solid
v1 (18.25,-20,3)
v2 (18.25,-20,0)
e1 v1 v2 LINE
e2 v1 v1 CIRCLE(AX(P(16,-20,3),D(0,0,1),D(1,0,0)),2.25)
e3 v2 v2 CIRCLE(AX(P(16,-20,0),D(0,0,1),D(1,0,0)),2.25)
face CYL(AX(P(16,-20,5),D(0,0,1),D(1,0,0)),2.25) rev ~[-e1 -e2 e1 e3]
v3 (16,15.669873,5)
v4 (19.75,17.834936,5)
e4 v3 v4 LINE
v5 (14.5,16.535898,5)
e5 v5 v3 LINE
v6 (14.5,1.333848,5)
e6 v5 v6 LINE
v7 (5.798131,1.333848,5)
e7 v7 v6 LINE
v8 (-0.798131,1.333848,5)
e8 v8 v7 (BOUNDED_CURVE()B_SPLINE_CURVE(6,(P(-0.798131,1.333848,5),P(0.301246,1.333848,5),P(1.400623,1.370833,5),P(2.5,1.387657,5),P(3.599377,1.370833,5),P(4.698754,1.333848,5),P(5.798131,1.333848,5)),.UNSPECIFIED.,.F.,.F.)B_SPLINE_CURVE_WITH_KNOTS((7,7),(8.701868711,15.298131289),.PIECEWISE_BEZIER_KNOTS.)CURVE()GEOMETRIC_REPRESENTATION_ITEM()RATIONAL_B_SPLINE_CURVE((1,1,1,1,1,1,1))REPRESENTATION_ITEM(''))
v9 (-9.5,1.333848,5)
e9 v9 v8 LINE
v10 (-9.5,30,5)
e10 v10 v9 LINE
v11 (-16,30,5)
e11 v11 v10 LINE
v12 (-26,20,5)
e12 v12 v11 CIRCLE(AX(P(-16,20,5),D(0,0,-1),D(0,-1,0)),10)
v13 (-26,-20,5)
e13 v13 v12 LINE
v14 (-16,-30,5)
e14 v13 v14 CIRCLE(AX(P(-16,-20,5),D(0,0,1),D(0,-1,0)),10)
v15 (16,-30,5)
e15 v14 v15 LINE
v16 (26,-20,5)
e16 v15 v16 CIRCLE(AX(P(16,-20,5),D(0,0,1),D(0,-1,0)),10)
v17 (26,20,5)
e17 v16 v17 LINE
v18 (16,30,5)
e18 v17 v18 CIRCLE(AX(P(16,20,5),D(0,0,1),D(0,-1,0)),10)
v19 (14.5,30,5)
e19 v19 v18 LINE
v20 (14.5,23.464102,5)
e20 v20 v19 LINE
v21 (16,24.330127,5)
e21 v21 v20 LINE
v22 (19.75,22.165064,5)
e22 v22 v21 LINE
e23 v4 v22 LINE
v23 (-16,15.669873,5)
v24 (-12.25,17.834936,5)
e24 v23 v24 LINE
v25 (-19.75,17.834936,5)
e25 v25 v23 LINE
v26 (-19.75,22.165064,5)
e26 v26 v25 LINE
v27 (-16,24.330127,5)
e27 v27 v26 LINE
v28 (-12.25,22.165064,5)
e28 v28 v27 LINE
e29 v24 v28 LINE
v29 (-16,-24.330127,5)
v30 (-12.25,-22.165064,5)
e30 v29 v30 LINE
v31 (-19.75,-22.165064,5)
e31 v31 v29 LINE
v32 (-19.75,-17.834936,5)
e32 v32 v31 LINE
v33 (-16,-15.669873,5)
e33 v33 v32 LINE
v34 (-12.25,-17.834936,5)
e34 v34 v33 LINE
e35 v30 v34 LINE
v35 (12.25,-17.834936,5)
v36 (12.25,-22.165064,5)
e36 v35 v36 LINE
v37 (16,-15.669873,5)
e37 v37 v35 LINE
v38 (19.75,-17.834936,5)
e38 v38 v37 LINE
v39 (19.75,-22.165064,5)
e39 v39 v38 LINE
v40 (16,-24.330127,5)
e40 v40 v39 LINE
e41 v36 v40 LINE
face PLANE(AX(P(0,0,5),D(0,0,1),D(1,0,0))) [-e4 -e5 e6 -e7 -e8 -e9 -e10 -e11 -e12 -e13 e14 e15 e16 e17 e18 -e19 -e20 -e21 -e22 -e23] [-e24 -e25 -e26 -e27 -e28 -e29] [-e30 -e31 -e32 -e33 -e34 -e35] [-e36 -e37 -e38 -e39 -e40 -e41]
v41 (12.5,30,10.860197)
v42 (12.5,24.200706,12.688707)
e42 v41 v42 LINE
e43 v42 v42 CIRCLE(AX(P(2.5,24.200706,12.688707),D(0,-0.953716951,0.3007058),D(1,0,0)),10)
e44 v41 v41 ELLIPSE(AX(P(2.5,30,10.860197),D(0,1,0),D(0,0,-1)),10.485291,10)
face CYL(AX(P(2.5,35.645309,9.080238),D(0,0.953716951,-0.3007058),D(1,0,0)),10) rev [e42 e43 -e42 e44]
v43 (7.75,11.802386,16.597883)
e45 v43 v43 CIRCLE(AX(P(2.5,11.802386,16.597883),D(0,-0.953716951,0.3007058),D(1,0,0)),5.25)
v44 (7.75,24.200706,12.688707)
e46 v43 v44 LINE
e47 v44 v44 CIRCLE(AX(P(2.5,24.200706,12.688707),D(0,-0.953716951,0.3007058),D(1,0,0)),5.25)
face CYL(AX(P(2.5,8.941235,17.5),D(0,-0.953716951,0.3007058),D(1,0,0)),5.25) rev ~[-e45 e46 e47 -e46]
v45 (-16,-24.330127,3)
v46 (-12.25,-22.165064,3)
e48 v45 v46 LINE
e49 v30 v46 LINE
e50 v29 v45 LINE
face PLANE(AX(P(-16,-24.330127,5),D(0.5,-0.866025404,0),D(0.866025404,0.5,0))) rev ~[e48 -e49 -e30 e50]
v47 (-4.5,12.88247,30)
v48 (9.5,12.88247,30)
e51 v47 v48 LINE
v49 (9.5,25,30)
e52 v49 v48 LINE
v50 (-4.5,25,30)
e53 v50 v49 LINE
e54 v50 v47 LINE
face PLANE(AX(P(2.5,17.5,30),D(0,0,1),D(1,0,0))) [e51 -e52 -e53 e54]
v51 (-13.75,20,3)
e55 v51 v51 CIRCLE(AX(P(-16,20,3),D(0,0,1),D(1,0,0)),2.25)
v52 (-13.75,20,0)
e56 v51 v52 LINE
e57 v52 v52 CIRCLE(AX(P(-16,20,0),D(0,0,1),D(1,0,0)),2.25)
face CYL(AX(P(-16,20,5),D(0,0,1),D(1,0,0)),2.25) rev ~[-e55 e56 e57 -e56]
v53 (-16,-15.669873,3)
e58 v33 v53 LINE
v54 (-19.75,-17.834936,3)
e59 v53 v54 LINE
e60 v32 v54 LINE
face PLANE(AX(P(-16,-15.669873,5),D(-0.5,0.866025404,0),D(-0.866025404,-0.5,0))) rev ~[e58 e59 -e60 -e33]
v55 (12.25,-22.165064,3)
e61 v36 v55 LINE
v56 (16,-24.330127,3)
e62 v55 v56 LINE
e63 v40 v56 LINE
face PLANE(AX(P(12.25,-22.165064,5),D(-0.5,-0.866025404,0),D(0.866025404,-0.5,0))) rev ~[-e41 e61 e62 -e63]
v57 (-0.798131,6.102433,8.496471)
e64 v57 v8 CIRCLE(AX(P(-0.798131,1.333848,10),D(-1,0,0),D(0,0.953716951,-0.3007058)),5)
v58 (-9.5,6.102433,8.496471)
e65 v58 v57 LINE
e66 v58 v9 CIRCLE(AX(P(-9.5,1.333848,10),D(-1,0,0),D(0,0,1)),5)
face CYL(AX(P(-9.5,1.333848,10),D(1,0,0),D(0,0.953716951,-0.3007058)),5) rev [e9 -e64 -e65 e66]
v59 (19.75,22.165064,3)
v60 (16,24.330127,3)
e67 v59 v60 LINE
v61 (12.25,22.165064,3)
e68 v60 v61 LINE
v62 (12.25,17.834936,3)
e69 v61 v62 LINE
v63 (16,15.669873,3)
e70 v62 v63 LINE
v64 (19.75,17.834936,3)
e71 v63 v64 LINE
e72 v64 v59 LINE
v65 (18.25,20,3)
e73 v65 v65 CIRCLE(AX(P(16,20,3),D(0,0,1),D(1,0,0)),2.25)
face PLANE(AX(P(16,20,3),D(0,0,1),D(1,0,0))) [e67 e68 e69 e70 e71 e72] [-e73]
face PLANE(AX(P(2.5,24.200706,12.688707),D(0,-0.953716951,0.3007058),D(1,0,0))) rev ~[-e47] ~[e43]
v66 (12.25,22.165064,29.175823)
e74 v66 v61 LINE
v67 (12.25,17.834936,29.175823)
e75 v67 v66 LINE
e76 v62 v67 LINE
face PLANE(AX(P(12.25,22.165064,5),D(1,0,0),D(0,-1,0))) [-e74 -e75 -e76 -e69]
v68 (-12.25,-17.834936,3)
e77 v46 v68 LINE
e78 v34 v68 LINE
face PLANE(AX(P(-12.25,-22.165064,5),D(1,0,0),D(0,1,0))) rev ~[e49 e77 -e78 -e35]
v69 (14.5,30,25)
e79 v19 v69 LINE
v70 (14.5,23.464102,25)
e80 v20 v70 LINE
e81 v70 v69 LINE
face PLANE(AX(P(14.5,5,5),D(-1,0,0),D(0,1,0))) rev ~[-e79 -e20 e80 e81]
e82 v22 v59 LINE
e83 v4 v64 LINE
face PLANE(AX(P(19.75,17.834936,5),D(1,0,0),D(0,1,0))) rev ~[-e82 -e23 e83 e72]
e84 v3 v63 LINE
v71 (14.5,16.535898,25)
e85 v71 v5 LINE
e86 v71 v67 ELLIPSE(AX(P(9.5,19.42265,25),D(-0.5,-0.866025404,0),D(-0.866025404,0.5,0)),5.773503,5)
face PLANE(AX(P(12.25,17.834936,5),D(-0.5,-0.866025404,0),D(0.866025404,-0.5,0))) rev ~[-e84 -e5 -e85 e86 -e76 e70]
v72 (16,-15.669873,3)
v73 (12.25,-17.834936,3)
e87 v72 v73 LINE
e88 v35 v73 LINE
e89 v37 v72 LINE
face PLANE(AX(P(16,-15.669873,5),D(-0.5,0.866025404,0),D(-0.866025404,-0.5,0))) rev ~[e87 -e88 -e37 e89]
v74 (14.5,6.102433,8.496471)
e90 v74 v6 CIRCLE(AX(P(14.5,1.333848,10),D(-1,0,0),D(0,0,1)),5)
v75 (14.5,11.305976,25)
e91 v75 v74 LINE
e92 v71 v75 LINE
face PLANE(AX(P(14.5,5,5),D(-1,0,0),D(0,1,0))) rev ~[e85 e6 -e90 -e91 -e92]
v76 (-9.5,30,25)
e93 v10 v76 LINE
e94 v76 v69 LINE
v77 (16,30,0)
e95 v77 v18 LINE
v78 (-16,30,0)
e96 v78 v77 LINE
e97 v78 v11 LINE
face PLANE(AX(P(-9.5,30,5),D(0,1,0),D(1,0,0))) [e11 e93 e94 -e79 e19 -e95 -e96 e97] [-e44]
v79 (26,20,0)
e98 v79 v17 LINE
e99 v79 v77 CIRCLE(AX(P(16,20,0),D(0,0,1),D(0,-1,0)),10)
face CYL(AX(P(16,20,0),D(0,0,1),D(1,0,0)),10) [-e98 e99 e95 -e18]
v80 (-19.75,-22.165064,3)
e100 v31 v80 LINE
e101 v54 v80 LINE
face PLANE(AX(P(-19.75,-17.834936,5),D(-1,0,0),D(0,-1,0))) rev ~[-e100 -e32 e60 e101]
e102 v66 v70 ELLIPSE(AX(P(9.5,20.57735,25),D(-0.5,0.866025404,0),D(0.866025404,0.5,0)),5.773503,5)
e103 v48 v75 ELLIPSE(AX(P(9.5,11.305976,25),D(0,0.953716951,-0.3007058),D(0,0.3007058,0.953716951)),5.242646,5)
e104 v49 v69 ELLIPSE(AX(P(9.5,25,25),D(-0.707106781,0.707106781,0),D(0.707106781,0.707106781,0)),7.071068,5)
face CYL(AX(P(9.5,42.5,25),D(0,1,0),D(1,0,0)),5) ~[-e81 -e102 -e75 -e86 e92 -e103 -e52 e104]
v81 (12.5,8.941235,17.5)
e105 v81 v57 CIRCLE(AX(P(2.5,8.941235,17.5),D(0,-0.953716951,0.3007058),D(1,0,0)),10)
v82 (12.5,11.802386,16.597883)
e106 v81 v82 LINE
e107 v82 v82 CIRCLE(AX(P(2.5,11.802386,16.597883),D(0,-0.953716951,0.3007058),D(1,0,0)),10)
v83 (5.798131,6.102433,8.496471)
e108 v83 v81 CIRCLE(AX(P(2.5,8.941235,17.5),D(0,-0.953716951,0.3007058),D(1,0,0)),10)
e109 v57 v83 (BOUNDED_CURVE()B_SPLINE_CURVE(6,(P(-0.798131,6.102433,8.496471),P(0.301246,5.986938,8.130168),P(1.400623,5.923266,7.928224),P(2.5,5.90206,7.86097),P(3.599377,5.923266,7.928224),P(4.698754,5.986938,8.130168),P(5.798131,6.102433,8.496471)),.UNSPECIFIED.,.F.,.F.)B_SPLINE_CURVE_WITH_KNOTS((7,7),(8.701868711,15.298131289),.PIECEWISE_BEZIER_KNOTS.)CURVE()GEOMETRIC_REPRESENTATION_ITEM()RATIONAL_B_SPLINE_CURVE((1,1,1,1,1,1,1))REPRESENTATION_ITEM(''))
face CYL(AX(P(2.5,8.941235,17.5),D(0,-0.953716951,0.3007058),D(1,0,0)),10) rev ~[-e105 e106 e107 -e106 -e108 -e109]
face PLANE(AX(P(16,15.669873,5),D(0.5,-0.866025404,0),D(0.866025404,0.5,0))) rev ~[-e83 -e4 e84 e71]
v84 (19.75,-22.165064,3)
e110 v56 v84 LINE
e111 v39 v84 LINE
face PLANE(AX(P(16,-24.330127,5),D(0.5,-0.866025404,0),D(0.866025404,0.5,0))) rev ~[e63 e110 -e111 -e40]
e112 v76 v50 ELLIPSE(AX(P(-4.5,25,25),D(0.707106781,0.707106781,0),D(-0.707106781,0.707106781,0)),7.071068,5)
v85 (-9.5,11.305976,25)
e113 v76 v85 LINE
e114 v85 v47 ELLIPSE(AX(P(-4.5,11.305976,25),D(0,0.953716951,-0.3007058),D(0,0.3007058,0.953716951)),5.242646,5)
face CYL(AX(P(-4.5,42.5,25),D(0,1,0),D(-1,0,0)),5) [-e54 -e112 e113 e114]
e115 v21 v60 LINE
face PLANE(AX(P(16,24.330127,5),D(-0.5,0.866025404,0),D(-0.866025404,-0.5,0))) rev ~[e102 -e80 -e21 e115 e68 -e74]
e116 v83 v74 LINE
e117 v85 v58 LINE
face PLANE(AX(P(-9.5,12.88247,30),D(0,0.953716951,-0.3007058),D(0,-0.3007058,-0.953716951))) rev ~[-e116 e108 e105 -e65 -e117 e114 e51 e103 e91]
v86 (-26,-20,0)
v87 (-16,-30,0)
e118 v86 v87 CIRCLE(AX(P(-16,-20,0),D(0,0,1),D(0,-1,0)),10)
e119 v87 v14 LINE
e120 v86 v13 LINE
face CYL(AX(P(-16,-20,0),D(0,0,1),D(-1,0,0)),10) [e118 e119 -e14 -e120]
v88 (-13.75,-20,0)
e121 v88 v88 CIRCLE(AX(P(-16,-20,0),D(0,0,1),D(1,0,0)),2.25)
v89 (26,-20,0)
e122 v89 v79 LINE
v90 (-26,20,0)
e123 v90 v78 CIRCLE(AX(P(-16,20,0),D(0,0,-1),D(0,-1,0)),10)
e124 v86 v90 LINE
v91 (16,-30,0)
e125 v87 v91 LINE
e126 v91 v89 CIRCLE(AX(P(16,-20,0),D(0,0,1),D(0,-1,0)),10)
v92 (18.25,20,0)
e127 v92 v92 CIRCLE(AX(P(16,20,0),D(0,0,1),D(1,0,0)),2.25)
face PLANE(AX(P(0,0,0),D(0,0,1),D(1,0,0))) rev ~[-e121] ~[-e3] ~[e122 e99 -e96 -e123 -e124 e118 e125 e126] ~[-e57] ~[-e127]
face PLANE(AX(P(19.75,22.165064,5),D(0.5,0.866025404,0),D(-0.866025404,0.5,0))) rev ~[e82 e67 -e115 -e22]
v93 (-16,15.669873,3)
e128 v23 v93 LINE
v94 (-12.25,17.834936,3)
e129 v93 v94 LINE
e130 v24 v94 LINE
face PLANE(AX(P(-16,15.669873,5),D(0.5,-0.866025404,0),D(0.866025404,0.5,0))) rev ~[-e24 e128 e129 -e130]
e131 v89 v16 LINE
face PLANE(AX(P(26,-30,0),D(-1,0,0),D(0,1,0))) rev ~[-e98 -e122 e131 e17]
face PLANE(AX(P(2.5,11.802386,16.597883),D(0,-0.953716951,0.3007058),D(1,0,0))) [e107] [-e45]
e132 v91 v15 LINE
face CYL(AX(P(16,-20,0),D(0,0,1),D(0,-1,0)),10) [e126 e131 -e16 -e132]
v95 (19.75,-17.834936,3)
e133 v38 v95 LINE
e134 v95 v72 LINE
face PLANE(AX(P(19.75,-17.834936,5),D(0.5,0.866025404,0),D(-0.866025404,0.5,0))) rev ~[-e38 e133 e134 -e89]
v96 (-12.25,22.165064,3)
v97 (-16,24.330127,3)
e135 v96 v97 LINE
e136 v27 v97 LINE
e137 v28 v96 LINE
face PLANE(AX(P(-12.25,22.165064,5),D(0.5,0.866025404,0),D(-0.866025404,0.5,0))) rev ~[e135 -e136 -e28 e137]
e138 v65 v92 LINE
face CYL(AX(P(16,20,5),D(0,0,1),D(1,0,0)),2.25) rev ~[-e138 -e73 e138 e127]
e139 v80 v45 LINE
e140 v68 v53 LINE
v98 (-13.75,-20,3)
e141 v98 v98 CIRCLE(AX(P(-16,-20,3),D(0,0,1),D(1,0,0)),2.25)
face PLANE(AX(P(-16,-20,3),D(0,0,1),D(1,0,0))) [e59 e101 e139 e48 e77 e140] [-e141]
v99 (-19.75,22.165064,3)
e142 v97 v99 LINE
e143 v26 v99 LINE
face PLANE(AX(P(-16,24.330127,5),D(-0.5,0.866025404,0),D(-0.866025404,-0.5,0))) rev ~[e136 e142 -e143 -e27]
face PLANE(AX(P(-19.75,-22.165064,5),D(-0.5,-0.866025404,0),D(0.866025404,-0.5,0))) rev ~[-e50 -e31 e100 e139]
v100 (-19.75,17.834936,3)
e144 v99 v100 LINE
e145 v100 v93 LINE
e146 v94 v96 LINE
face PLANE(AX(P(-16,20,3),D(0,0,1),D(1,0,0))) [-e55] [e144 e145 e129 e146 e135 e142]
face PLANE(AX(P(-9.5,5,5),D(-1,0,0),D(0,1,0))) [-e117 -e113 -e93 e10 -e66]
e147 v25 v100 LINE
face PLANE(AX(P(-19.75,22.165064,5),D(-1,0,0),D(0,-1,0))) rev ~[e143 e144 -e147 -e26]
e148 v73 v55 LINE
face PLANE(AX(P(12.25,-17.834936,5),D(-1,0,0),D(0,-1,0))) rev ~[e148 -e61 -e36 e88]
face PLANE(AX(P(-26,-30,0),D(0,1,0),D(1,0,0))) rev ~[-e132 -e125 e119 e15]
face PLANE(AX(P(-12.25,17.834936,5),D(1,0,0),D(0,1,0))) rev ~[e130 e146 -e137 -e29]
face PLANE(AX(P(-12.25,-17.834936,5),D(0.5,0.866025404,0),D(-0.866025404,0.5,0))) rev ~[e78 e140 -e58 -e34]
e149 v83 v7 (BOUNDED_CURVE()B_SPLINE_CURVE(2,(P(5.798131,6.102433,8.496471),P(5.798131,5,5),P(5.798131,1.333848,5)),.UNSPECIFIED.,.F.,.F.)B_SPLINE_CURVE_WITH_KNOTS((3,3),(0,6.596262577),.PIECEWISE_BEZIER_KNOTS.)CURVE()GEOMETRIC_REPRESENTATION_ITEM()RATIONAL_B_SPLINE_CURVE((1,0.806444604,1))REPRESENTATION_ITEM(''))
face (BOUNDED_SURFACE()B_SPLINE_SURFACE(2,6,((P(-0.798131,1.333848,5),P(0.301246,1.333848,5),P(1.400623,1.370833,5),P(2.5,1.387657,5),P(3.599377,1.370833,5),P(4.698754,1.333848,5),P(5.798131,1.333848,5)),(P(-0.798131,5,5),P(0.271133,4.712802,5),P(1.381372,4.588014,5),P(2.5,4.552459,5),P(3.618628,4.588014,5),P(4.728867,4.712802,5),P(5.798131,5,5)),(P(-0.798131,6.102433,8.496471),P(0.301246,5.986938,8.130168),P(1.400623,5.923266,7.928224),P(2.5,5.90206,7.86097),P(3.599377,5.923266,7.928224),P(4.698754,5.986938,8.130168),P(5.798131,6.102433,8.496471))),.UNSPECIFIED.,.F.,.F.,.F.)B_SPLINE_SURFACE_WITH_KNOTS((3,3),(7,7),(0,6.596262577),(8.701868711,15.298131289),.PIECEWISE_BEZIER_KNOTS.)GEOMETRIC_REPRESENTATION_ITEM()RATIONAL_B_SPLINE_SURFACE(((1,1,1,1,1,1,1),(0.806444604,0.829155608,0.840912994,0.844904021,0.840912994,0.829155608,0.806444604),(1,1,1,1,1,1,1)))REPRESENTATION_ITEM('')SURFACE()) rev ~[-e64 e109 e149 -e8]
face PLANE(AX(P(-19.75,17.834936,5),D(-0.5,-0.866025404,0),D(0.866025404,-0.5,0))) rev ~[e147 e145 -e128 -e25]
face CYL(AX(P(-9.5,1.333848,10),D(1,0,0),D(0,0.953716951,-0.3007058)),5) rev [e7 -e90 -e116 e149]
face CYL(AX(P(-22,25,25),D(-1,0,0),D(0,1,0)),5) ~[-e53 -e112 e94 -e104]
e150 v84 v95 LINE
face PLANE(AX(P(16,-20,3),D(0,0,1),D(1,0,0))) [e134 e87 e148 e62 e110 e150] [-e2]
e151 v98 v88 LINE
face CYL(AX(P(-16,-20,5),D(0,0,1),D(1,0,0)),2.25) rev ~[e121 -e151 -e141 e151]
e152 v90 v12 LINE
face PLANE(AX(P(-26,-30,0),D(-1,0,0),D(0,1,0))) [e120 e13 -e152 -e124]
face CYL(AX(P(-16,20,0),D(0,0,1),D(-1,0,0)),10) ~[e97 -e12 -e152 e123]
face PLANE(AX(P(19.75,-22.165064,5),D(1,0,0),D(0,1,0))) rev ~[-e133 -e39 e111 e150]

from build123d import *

# Parameters (mm, degrees)
F0_W         = 52
F0_H         = 60
F1_DEPTH     = 5
F2_R         = 10
F3_R         = 2.25
F4_DEPTH     = 25
F6_DEPTH     = 2
F7_W         = 24
F7_H         = 25
F8_DEPTH     = 25
F10_DEPTH    = 35.501
F11_R        = 5.25
F12_DEPTH    = 25.3474527662
F13_R        = 10
F13_R_2      = 5.25
F14_DEPTH    = 3
F16_R        = 10
F17_DEPTH    = 12
F18_DEPTH    = 25.001
F19_F1_R     = 5
F19_T2_DEPTH = 42.117530278
F19_T4_DEPTH = 31.5358983849
F19_T6_DEPTH = 28.6534286629
F19_T8_DEPTH = 49


# Not quite as in the source:
# - a fillet or chamfer that OpenCascade refuses, or shapes differently, is made with other operations: its cross-section is extruded or revolved along the edge and cut away or added


with BuildPart() as f1:
    # F0 (on Top) → F1 (new body)
    with BuildSketch(Plane.XY):
        Rectangle(F0_W, F0_H)
    extrude(amount=F1_DEPTH)

    # F2
    f2_edges = [f1.edges().sort_by_distance(p)[0] for p in [
        (26, -30, 2.5),
        (-26, -30, 2.5),
        (26, 30, 2.5),
        (-26, 30, 2.5),
    ]]
    fillet(f2_edges, radius=F2_R)

    # F3 (on face) → F4 (cut)
    with BuildSketch(Plane.XY.offset(5)):
        with Locations((-16, -20)):
            Circle(F3_R)
        with Locations((16, -20)):
            Circle(F3_R)
        with Locations((-16, 20)):
            Circle(F3_R)
        with Locations((16, 20)):
            Circle(F3_R)
    extrude(amount=-F4_DEPTH, mode=Mode.SUBTRACT)

    # F5 (on face) → F6 (cut)
    with BuildSketch(Plane.XY.offset(5)):
        Polygon((-16, -15.6698729811), (-19.75, -17.8349364905), (-19.75, -22.1650635095), (-16, -24.3301270189), (-12.25, -22.1650635095), (-12.25, -17.8349364905), align=None)
        Polygon((-12.25, 22.1650635095), (-16, 24.3301270189), (-19.75, 22.1650635095), (-19.75, 17.8349364905), (-16, 15.6698729811), (-12.25, 17.8349364905), align=None)
        Polygon((19.75, -17.8349364905), (16, -15.6698729811), (12.25, -17.8349364905), (12.25, -22.1650635095), (16, -24.3301270189), (19.75, -22.1650635095), align=None)
        Polygon((19.75, 22.1650635095), (16, 24.3301270189), (12.25, 22.1650635095), (12.25, 17.8349364905), (16, 15.6698729811), (19.75, 17.8349364905), align=None)
    extrude(amount=-F6_DEPTH, mode=Mode.SUBTRACT)

    # F7 (on face) → F8 (join)
    with BuildSketch(Plane.XY.offset(5)):
        with Locations((2.5, 17.5)):
            Rectangle(F7_W, F7_H)
    extrude(amount=F8_DEPTH)

    # F9 (on face) → F10 (cut, through all)
    with BuildSketch(Plane(origin=(-9.5, 0, 0), x_dir=(0, -1, 0), z_dir=(-1, 0, 0))):
        Polygon((-12.882469722, 30), (-5, 5), (-5, 30), align=None)
    extrude(amount=-F10_DEPTH, mode=Mode.SUBTRACT)

    # F11 (on face) → F12 (cut, through all)
    with BuildSketch(Plane(origin=(0, 3.1139390198, -0.9818212016), x_dir=(1, 0, 0), z_dir=(0, -0.9537169507, 0.3007057995))):
        with Locations((2.5, 19.3787278155)):
            Circle(F11_R)
    extrude(amount=-F12_DEPTH, mode=Mode.SUBTRACT)

    # F13 (on face) → F14 (cut)
    with BuildSketch(Plane(origin=(0, 3.1139390198, -0.9818212016), x_dir=(1, 0, 0), z_dir=(0, -0.9537169507, 0.3007057995))):
        with Locations((2.5, 19.3787278155)):
            Circle(F13_R)
        with Locations((2.5, 19.3787278155)):
            Circle(F13_R_2, mode=Mode.SUBTRACT)
    extrude(amount=-F14_DEPTH, mode=Mode.SUBTRACT)

    # F16 (on offset) → F17 (cut)
    with BuildSketch(Plane(origin=(0, 29.8180136408, -9.4015835877), x_dir=(1, 0, 0), z_dir=(0, -0.9537169507, 0.3007057995))):
        with Locations((2.5, 19.3787278155)):
            Circle(F16_R)
    extrude(amount=F17_DEPTH, mode=Mode.SUBTRACT)

    # F5 (on face) → F18 (cut, through all)
    with BuildSketch(Plane.XY.offset(5)):
        Polygon((-16, -15.6698729811), (-19.75, -17.8349364905), (-19.75, -22.1650635095), (-16, -24.3301270189), (-12.25, -22.1650635095), (-12.25, -17.8349364905), align=None)
        Polygon((-12.25, 22.1650635095), (-16, 24.3301270189), (-19.75, 22.1650635095), (-19.75, 17.8349364905), (-16, 15.6698729811), (-12.25, 17.8349364905), align=None)
        Polygon((19.75, -17.8349364905), (16, -15.6698729811), (12.25, -17.8349364905), (12.25, -22.1650635095), (16, -24.3301270189), (19.75, -22.1650635095), align=None)
        Polygon((19.75, 22.1650635095), (16, 24.3301270189), (12.25, 22.1650635095), (12.25, 17.8349364905), (16, 15.6698729811), (19.75, 17.8349364905), align=None)
    extrude(amount=F18_DEPTH, mode=Mode.SUBTRACT)

    # F19: fillet of radius 5 on 5 edges, made by hand

    # F19_f1
    f19_f1_edges = [f1.edges().sort_by_distance(p)[0] for p in [
        (2.5, 5, 5),
    ]]
    fillet(f19_f1_edges, radius=F19_F1_R)

    # F19_s3 → F19_t2 (cut)
    with BuildSketch(Plane.XZ.offset(-42.5)):
        with BuildLine():
            ThreePointArc((-9.5, 25), (-8.0355339059, 28.5355339059), (-4.5, 30))
            Line((-4.5, 30), (-4.5, 30.1))
            Line((-4.5, 30.1), (-9.6, 30.1))
            Line((-9.6, 30.1), (-9.6, 25))
            Line((-9.6, 25), (-9.5, 25))
        make_face()
    extrude(amount=F19_T2_DEPTH, mode=Mode.SUBTRACT)

    # F19_s5 → F19_t4 (cut)
    with BuildSketch(Plane.XZ.offset(-42.5)):
        with BuildLine():
            ThreePointArc((14.5, 25), (13.0355339059, 28.5355339059), (9.5, 30))
            Line((9.5, 30), (9.5, 30.1))
            Line((9.5, 30.1), (14.6, 30.1))
            Line((14.6, 30.1), (14.6, 25))
            Line((14.6, 25), (14.5, 25))
        make_face()
    extrude(amount=F19_T4_DEPTH, mode=Mode.SUBTRACT)

    # F19_s7 → F19_t6 (cut)
    with BuildSketch(Plane.XZ.offset(-29.0358983849)):
        with BuildLine():
            ThreePointArc((14.5, 25), (13.0355339059, 28.5355339059), (9.5, 30))
            Line((9.5, 30), (9.5, 30.1))
            Line((9.5, 30.1), (14.6, 30.1))
            Line((14.6, 30.1), (14.6, 25))
            Line((14.6, 25), (14.5, 25))
        make_face()
    extrude(amount=F19_T6_DEPTH, mode=Mode.SUBTRACT)

    # F19_s9 → F19_t8 (cut)
    with BuildSketch(Plane.YZ.offset(-22)):
        with BuildLine():
            ThreePointArc((30, 25), (28.5355339059, 28.5355339059), (25, 30))
            Line((25, 30), (25, 30.1))
            Line((25, 30.1), (30.1, 30.1))
            Line((30.1, 30.1), (30.1, 25))
            Line((30.1, 25), (30, 25))
        make_face()
    extrude(amount=F19_T8_DEPTH, mode=Mode.SUBTRACT)


solid = f1.part
